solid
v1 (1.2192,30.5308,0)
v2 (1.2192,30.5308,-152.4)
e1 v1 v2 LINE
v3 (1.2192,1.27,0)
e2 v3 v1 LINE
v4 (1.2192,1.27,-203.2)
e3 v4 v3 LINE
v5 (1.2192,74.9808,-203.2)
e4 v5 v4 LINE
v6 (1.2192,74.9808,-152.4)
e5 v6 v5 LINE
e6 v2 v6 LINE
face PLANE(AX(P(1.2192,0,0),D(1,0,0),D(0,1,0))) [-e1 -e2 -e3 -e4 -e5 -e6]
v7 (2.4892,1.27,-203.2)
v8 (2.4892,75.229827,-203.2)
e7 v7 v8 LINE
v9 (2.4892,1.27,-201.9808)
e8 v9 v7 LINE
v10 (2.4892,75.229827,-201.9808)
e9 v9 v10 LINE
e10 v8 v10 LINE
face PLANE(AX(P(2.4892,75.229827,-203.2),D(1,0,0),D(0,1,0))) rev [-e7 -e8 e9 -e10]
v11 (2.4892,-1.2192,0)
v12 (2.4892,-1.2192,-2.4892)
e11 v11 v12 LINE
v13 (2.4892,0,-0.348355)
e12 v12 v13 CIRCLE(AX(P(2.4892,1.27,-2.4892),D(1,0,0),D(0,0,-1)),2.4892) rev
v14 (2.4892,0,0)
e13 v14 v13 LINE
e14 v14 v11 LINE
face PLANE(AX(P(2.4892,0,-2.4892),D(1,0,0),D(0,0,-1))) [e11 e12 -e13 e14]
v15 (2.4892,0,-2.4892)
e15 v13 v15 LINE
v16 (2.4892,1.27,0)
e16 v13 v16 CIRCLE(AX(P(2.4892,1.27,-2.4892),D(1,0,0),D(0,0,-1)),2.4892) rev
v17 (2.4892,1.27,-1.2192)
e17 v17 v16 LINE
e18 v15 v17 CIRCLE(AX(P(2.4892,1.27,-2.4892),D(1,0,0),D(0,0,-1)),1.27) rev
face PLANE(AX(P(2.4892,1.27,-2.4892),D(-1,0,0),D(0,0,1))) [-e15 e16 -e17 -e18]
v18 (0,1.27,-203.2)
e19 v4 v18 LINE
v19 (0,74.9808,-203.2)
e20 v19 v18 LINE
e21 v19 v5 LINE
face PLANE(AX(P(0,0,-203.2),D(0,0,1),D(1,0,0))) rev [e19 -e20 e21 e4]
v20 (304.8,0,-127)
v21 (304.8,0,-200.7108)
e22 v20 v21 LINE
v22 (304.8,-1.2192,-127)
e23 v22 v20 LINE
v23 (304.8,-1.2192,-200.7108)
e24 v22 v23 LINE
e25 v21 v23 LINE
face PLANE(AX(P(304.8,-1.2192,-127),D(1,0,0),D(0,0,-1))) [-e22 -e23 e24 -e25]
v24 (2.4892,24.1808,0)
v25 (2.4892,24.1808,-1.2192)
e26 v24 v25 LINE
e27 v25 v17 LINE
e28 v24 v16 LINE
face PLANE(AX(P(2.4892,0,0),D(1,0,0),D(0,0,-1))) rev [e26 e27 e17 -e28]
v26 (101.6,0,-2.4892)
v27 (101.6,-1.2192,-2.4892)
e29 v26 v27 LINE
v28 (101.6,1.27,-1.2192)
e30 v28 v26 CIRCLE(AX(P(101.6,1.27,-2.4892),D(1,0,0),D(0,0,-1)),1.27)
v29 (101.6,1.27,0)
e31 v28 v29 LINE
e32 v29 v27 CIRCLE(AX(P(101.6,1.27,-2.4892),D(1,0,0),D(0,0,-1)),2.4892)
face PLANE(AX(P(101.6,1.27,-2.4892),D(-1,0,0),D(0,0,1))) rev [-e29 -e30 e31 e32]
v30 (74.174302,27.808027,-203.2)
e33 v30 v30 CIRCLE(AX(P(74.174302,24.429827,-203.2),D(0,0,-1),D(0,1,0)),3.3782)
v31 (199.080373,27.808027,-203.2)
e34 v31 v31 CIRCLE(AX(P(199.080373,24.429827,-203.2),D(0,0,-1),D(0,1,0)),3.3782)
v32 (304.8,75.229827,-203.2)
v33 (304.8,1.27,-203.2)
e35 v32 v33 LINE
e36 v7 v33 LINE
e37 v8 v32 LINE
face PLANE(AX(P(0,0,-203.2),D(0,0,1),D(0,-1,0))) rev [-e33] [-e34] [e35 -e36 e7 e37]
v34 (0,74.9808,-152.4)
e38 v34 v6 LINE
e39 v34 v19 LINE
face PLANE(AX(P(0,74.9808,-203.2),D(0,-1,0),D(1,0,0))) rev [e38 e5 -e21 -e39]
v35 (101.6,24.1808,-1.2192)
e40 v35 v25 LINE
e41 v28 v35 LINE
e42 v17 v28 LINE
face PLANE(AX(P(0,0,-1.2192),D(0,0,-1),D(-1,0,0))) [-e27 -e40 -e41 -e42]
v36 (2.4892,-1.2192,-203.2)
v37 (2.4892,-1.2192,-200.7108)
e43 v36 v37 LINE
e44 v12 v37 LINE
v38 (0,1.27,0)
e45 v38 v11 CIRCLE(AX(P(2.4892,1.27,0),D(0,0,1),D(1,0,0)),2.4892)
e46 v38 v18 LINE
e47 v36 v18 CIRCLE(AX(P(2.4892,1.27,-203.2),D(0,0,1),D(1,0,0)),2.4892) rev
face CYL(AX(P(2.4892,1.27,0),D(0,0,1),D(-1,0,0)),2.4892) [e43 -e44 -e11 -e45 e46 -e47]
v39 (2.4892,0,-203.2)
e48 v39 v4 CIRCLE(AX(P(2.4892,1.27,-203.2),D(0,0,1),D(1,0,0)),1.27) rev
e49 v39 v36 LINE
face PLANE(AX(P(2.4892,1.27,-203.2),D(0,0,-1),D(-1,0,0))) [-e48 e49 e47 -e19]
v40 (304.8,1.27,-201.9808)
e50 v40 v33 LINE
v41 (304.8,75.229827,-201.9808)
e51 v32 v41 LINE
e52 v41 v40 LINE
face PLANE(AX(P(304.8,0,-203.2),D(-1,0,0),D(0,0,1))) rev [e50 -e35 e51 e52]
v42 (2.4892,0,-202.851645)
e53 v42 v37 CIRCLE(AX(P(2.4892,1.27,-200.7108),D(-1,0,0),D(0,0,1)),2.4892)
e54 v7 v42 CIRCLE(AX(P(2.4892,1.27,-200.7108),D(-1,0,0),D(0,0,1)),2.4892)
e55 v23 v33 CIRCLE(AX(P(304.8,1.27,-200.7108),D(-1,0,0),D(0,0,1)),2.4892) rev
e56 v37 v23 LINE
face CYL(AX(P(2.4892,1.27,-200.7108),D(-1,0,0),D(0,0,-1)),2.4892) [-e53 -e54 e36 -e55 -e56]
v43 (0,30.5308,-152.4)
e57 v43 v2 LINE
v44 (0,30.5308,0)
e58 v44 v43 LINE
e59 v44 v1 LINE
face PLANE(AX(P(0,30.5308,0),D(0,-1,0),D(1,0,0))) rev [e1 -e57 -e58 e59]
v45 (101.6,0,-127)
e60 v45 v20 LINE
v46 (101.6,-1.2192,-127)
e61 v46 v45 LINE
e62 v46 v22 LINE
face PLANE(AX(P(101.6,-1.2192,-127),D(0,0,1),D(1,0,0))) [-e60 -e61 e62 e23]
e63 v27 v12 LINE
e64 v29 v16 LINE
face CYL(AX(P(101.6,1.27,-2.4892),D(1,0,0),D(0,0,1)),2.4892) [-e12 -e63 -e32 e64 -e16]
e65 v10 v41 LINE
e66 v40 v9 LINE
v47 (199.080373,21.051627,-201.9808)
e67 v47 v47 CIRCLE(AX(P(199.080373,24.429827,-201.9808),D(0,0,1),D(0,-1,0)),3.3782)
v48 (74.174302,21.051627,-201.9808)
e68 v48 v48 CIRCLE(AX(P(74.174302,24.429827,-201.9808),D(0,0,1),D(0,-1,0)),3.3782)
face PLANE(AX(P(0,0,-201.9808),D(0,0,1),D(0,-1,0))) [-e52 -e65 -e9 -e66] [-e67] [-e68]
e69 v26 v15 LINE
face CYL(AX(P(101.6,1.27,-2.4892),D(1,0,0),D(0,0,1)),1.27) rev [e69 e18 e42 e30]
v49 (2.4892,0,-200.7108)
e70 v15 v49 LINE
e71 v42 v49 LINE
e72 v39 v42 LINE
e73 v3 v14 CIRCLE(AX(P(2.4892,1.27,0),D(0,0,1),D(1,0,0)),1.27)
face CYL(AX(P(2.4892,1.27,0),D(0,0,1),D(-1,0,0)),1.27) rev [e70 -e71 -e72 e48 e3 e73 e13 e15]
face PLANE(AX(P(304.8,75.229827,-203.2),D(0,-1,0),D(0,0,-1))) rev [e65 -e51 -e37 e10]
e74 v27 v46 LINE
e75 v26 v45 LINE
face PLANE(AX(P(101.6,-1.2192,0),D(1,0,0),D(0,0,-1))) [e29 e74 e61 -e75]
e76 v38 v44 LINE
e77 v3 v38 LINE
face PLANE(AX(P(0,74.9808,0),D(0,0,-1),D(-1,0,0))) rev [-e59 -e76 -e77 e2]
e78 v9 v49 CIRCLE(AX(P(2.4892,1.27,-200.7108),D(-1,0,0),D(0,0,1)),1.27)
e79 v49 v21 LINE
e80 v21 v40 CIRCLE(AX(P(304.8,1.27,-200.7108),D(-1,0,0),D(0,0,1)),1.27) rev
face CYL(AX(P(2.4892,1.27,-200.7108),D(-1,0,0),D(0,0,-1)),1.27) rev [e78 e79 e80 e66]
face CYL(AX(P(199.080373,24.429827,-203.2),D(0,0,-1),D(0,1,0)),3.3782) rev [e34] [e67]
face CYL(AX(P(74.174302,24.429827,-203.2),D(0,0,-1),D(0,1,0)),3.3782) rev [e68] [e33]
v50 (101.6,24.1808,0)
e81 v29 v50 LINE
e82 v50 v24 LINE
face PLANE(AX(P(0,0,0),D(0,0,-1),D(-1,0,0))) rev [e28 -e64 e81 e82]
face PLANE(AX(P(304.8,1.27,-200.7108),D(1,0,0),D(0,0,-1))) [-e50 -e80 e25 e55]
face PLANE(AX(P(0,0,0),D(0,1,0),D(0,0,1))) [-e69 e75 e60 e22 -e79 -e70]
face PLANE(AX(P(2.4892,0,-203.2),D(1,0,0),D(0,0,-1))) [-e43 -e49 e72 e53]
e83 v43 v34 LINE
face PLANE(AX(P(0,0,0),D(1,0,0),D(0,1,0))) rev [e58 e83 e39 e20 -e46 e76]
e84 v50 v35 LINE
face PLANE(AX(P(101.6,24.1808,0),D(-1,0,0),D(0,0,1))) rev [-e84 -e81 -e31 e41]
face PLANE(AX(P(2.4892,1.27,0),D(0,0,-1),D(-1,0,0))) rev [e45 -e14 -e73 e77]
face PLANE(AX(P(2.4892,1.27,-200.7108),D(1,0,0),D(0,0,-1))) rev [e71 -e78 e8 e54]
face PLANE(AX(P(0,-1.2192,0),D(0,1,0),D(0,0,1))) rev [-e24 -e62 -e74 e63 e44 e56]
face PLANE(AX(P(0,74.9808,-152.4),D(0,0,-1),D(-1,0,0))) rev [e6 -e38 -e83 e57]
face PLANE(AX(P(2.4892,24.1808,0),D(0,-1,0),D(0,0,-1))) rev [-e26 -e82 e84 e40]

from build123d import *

# Parameters (mm, degrees)
BASE_FLANGE1_DEPTH           = 1.2192
EDGE_FLANGE1_STRIP_W         = 7.4168
EDGE_FLANGE1_STRIP_H         = 1.2192
EDGE_FLANGE1_STRIP_CUT_DEPTH = 203.2
EDGE_FLANGE1_DEPTH           = 203.2
EDGE_FLANGE2_STRIP_W         = 7.4168
EDGE_FLANGE2_STRIP_H         = 1.2192
EDGE_FLANGE2_STRIP_CUT_DEPTH = 302.3108
EDGE_FLANGE2_DEPTH           = 302.3108
F_1_4_0_25_DIAMETER_HOLE1_D  = 6.7564
SKETCH15_W                   = 152.4
SKETCH15_H                   = 44.45
CUT_EXTRUDE2_DEPTH           = 373.975962979
F_1_4_0_25_DIAMETER_HOLE3_D  = 6.7564
EDGE_FLANGE3_STRIP_W         = 7.4168
EDGE_FLANGE3_STRIP_H         = 1.2192
EDGE_FLANGE3_STRIP_CUT_DEPTH = 99.1108
EDGE_FLANGE3_DEPTH           = 99.1108


# Sheet-metal steps are written as plain solids
with BuildPart() as part:
    # Sketch1 → Base-Flange1 (new body)
    with BuildSketch(Plane(origin=(0, 0, 0), x_dir=(1, 0, 0), z_dir=(0, 1, 0))):
        Polygon((0, 0), (0, 203.2), (304.8, 203.2), (304.8, 127), (101.6, 127), (101.6, 0), align=None)
    extrude(amount=-BASE_FLANGE1_DEPTH)

    # Edge-Flange1 strip (across the edge) → Edge-Flange1 strip cut (cut)
    with BuildSketch(Plane.XY.offset(-203.2)):
        with Locations((-1.2192, -0.6096)):
            Rectangle(EDGE_FLANGE1_STRIP_W, EDGE_FLANGE1_STRIP_H)
    extrude(amount=EDGE_FLANGE1_STRIP_CUT_DEPTH, mode=Mode.SUBTRACT)

    # Edge-Flange1 section (across the edge) → Edge-Flange1 (add)
    with BuildSketch(Plane.XY.offset(-203.2)):
        with BuildLine():
            Line((0, 1.27), (0, 74.9808))
            Line((0, 74.9808), (1.2192, 74.9808))
            Line((1.2192, 74.9808), (1.2192, 1.27))
            ThreePointArc((1.2192, 1.27), (1.591174388, 0.371974388), (2.4892, 0))
            Line((2.4892, 0), (2.4892, -1.2192))
            ThreePointArc((2.4892, -1.2192), (0.7290698, -0.4901302), (0, 1.27))
        make_face()
    extrude(amount=EDGE_FLANGE1_DEPTH)

    # Edge-Flange2 strip (across the edge) → Edge-Flange2 strip cut (cut)
    with BuildSketch(Plane(origin=(304.8, 0, -203.2), x_dir=(0, 0, 1), z_dir=(-1, 0, 0))):
        with Locations((-1.2192, -0.6096)):
            Rectangle(EDGE_FLANGE2_STRIP_W, EDGE_FLANGE2_STRIP_H)
    extrude(amount=EDGE_FLANGE2_STRIP_CUT_DEPTH, mode=Mode.SUBTRACT)

    # Edge-Flange2 section (across the edge) → Edge-Flange2 (add)
    with BuildSketch(Plane(origin=(304.8, 0, -203.2), x_dir=(0, 0, 1), z_dir=(-1, 0, 0))):
        with BuildLine():
            Line((0, 1.27), (0, 75.229826743))
            Line((0, 75.229826743), (1.2192, 75.229826743))
            Line((1.2192, 75.229826743), (1.2192, 1.27))
            ThreePointArc((1.2192, 1.27), (1.591174388, 0.371974388), (2.4892, 0))
            Line((2.4892, 0), (2.4892, -1.2192))
            ThreePointArc((2.4892, -1.2192), (0.7290698, -0.4901302), (0, 1.27))
        make_face()
    extrude(amount=EDGE_FLANGE2_DEPTH)

    # 1/4 (0.25) Diameter Hole1 (through all)
    with Locations(Plane(origin=(74.174301672, 24.429826743, -203.2), x_dir=(0, -1, 0), z_dir=(0, 0, -1))):
        with Locations((0, 0)):
            Hole(F_1_4_0_25_DIAMETER_HOLE1_D / 2)

    # Sketch15 → Cut-Extrude2 (cut, through all)
    with BuildSketch(Plane(origin=(1.2192, 0, 0), x_dir=(0, 0, -1), z_dir=(1, 0, 0))):
        with Locations((76.2, 52.7558)):
            Rectangle(SKETCH15_W, SKETCH15_H)
    extrude(amount=-CUT_EXTRUDE2_DEPTH, mode=Mode.SUBTRACT)

    # 1/4 (0.25) Diameter Hole3 (through all)
    with Locations(Plane(origin=(199.080372839, 24.429826743, -203.2), x_dir=(0, -1, 0), z_dir=(0, 0, -1))):
        with Locations((0, 0)):
            Hole(F_1_4_0_25_DIAMETER_HOLE3_D / 2)

    # Edge-Flange3 strip (across the edge) → Edge-Flange3 strip cut (cut)
    with BuildSketch(Plane(origin=(2.4892, 0, 0), x_dir=(0, 0, -1), z_dir=(1, 0, 0))):
        with Locations((-1.2192, -0.6096)):
            Rectangle(EDGE_FLANGE3_STRIP_W, EDGE_FLANGE3_STRIP_H)
    extrude(amount=EDGE_FLANGE3_STRIP_CUT_DEPTH, mode=Mode.SUBTRACT)

    # Edge-Flange3 section (across the edge) → Edge-Flange3 (add)
    with BuildSketch(Plane(origin=(2.4892, 0, 0), x_dir=(0, 0, -1), z_dir=(1, 0, 0))):
        with BuildLine():
            Line((0, 1.27), (0, 24.1808))
            Line((0, 24.1808), (1.2192, 24.1808))
            Line((1.2192, 24.1808), (1.2192, 1.27))
            ThreePointArc((1.2192, 1.27), (1.591174388, 0.371974388), (2.4892, 0))
            Line((2.4892, 0), (2.4892, -1.2192))
            ThreePointArc((2.4892, -1.2192), (0.7290698, -0.4901302), (0, 1.27))
        make_face()
    extrude(amount=EDGE_FLANGE3_DEPTH)


solid = part.part
